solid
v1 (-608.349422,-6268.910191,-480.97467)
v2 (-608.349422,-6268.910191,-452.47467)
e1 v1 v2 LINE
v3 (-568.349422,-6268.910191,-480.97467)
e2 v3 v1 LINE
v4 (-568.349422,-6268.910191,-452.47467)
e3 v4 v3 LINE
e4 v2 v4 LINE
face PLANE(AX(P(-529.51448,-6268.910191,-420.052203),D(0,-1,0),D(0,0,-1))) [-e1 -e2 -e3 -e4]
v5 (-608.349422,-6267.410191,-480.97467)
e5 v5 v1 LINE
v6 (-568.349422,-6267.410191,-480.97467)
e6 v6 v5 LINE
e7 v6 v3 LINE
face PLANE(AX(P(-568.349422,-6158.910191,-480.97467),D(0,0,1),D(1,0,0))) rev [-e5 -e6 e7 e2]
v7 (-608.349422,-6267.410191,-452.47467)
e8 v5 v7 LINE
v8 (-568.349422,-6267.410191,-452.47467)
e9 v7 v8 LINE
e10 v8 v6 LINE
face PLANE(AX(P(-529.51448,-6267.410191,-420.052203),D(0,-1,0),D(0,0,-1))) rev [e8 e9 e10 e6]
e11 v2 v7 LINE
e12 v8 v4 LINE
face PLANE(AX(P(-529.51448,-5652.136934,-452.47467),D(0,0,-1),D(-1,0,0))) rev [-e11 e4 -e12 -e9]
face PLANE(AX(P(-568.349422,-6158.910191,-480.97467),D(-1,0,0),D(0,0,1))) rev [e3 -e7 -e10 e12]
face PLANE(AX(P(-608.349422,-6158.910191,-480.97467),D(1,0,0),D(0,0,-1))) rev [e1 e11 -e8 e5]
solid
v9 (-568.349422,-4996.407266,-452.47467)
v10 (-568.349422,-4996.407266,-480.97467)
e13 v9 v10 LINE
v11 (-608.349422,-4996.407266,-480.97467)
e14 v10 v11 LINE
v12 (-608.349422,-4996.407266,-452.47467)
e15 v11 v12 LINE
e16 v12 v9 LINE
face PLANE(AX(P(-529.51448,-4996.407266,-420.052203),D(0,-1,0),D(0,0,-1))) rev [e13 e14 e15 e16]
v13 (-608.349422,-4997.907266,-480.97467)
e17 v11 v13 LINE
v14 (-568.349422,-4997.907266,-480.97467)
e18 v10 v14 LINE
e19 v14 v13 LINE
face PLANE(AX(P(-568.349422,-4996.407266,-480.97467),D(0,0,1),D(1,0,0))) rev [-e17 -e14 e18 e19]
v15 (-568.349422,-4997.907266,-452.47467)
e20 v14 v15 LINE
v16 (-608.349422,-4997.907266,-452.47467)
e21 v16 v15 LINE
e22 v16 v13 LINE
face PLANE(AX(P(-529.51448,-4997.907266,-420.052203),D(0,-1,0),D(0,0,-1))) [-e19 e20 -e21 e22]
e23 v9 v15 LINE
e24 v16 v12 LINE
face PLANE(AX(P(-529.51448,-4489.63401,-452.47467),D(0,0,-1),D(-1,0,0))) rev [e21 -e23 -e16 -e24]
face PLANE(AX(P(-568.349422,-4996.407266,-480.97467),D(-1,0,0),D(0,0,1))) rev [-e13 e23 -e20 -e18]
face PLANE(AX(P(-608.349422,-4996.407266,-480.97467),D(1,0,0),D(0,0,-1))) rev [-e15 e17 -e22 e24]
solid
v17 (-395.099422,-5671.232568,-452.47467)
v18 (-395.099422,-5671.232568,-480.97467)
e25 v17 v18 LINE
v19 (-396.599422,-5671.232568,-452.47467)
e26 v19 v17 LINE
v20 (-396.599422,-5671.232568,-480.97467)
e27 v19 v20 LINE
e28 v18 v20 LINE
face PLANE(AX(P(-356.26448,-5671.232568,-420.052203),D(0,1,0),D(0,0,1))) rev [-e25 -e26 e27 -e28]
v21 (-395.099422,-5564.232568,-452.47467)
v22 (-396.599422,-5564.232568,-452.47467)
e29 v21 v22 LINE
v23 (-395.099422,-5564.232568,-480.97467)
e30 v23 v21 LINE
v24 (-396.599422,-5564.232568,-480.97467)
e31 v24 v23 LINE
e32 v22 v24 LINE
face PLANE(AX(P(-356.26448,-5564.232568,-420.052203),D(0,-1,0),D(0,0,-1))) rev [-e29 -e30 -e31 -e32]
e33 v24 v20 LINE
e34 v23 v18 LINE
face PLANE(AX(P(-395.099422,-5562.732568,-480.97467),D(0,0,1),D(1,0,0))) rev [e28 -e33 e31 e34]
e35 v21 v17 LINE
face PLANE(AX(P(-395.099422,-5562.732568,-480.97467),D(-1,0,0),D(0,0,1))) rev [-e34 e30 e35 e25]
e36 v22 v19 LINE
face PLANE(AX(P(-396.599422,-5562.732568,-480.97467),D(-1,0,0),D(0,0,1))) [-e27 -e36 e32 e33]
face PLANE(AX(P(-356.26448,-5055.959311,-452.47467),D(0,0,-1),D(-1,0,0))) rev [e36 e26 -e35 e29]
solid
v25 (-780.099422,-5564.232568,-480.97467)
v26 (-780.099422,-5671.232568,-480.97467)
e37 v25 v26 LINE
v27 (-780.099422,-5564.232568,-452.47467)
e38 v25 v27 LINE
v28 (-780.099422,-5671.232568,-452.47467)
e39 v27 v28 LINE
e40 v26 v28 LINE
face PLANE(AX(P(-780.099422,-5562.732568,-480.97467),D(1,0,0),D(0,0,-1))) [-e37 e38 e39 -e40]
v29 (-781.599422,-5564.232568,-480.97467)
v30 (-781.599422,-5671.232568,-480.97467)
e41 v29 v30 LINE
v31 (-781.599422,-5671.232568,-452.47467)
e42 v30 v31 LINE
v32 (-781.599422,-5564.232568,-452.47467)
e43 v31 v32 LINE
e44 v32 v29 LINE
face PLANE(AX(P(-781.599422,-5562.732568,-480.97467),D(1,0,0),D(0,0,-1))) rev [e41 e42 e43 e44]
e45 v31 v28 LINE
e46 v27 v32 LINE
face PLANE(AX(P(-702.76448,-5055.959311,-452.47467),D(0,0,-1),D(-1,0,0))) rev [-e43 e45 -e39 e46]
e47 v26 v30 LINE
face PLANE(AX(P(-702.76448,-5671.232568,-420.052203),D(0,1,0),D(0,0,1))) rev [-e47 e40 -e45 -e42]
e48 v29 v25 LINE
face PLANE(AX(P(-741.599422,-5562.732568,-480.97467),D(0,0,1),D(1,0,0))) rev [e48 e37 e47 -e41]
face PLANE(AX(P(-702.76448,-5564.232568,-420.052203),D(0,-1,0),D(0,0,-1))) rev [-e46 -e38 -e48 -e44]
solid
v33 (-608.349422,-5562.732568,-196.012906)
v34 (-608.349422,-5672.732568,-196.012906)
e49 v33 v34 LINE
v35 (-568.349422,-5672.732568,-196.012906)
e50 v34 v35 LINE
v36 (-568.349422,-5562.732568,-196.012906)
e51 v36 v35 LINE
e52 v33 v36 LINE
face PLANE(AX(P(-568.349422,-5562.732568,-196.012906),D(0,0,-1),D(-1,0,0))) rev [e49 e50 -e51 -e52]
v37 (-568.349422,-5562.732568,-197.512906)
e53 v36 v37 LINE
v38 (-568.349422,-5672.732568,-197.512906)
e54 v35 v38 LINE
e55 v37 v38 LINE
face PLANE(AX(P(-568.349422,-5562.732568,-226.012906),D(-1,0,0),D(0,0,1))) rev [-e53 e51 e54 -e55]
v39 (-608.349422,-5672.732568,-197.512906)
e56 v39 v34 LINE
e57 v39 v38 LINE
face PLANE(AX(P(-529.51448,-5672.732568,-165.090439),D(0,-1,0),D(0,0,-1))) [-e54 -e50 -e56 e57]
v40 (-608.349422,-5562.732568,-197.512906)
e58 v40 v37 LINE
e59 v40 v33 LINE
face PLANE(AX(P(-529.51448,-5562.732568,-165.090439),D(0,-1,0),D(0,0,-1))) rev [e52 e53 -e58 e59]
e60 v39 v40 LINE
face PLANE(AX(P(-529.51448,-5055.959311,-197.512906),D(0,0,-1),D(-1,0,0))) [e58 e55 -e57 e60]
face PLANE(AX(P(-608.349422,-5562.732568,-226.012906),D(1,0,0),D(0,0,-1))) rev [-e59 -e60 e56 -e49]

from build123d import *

# Parameters (mm, degrees)
SKETCH1_W            = 400
SKETCH1_H            = 300
BOSS_EXTRUDE1_DEPTH  = 1100
SHELL1_T             = -15
SPLIT2_START         = -6167.732568069
SPLIT2_OUTLINE_W     = 15
SPLIT2_OUTLINE_H     = 285
SPLIT2_DEPTH         = 1100
SPLIT2_2_OUTLINE_W   = 385
SPLIT2_2_OUTLINE_H   = 285
SPLIT2_2_DEPTH       = 15
SPLIT2_START_2       = -5082.732568069
SPLIT2_3_OUTLINE_W   = 385
SPLIT2_3_OUTLINE_H   = 285
SPLIT2_3_DEPTH       = 15
SPLIT2_START_3       = -6152.732568069
SPLIT2_4_OUTLINE_W   = 15
SPLIT2_4_OUTLINE_H   = 285
SPLIT2_4_DEPTH       = 1070
SPLIT2_5_OUTLINE_W   = 400
SPLIT2_5_OUTLINE_H   = 285
SPLIT2_5_DEPTH       = 15
SPLIT2_6_OUTLINE_W   = 400
SPLIT2_6_OUTLINE_H   = 285
SPLIT2_6_DEPTH       = 15
SCALE1_START         = -6275.660190895
SCALE1_OUTLINE_W     = 400
SCALE1_OUTLINE_H     = 285
SCALE1_OUTLINE_W_2   = 40
SCALE1_OUTLINE_H_2   = 28.5
SCALE1_OUTLINE_W_3   = 1.5
SCALE1_OUTLINE_H_3   = 15
SCALE1_OUTLINE_H_4   = 1.5
SCALE1_DEPTH         = 1286.002924444
SCALE1_START_2       = -6267.410190895
SCALE1_2_OUTLINE_W   = 1.5
SCALE1_2_OUTLINE_H   = 28.5
SCALE1_2_OUTLINE_W_2 = 40
SCALE1_2_OUTLINE_H_2 = 1.5
SCALE1_2_DEPTH       = 594.677622826
SCALE1_START_3       = -5562.732568069
SCALE1_3_OUTLINE_W   = 1.5
SCALE1_3_OUTLINE_H   = 28.5
SCALE1_3_OUTLINE_W_2 = 40
SCALE1_3_OUTLINE_H_2 = 1.5
SCALE1_3_DEPTH       = 564.825301618
SCALE1_4_OUTLINE_W   = 1.5
SCALE1_4_OUTLINE_H   = 28.5
SCALE1_4_OUTLINE_W_2 = 40
SCALE1_4_DEPTH       = 6.75
SCALE1_START_4       = -4996.407266451
SCALE1_5_OUTLINE_W   = 1.5
SCALE1_5_OUTLINE_H   = 28.5
SCALE1_5_OUTLINE_W_2 = 40
SCALE1_5_DEPTH       = 6.75
SCALE1_START_5       = -6268.910190895
SCALE1_6_OUTLINE_W   = 1.5
SCALE1_6_OUTLINE_H   = 28.5
SCALE1_6_DEPTH       = 597.677622826
SCALE1_START_6       = -5564.232568069
SCALE1_7_OUTLINE_W   = 1.5
SCALE1_7_OUTLINE_H   = 28.5
SCALE1_7_DEPTH       = 567.825301618


# Read off the part's stored shape, not the designer's step: Split2, Scale1
with BuildPart() as part:
    # Sketch1 → Boss-Extrude1 (new body)
    with BuildSketch(Plane(origin=(0, -6167.732568069, 0), x_dir=(1, 0, 0), z_dir=(0, 1, 0))):
        with Locations((-588.349422114, 459.224669701)):
            Rectangle(SKETCH1_W, SKETCH1_H)
    extrude(amount=BOSS_EXTRUDE1_DEPTH)

    # Shell1
    shell1_openings = [part.faces().sort_by_distance(p)[0] for p in [
        (-588.349422114, -5617.732568069, -609.224669701),
    ]]
    offset(amount=SHELL1_T, openings=shell1_openings, kind=Kind.INTERSECTION)


with BuildPart() as body_2:
    # Split1: the piece on the far side of the plane
    add(part.part)
    split(bisect_by=Plane(origin=(0, 0, -324.224669701), x_dir=(-1, 0, 0), z_dir=(0, 0, -1)), keep=Keep.BOTTOM)


with BuildPart() as part_1:
    add(part.part)

    # Split1
    split(bisect_by=Plane(origin=(0, 0, -324.224669701), x_dir=(-1, 0, 0), z_dir=(0, 0, -1)), keep=Keep.TOP)

    # Split2 outline → Split2 (cut)
    with BuildSketch(Plane(origin=(0, 0, 0), x_dir=(1, 0, 0), z_dir=(0, 1, 0)).offset(SPLIT2_START)):
        with Locations((-395.849422114, 466.724669701)):
            Rectangle(SPLIT2_OUTLINE_W, SPLIT2_OUTLINE_H)
    extrude(amount=SPLIT2_DEPTH, mode=Mode.SUBTRACT)

    # Split2 2 outline → Split2 2 (cut)
    with BuildSketch(Plane(origin=(0, 0, 0), x_dir=(1, 0, 0), z_dir=(0, 1, 0)).offset(SPLIT2_START)):
        with Locations((-595.849422114, 466.724669701)):
            Rectangle(SPLIT2_2_OUTLINE_W, SPLIT2_2_OUTLINE_H)
    extrude(amount=SPLIT2_2_DEPTH, mode=Mode.SUBTRACT)

    # Split2 3 outline → Split2 3 (cut)
    with BuildSketch(Plane(origin=(0, 0, 0), x_dir=(1, 0, 0), z_dir=(0, 1, 0)).offset(SPLIT2_START_2)):
        with Locations((-595.849422114, 466.724669701)):
            Rectangle(SPLIT2_3_OUTLINE_W, SPLIT2_3_OUTLINE_H)
    extrude(amount=SPLIT2_3_DEPTH, mode=Mode.SUBTRACT)


with BuildPart() as body_3:
    # Split2 4 outline → Split2 4 (new body)
    with BuildSketch(Plane(origin=(0, 0, 0), x_dir=(1, 0, 0), z_dir=(0, 1, 0)).offset(SPLIT2_START_3)):
        with Locations((-395.849422114, 466.724669701)):
            Rectangle(SPLIT2_4_OUTLINE_W, SPLIT2_4_OUTLINE_H)
    extrude(amount=SPLIT2_4_DEPTH)


with BuildPart() as body_4:
    # Split2 5 outline → Split2 5 (new body)
    with BuildSketch(Plane(origin=(0, 0, 0), x_dir=(1, 0, 0), z_dir=(0, 1, 0)).offset(SPLIT2_START)):
        with Locations((-588.349422114, 466.724669701)):
            Rectangle(SPLIT2_5_OUTLINE_W, SPLIT2_5_OUTLINE_H)
    extrude(amount=SPLIT2_5_DEPTH)


with BuildPart() as body_5:
    # Split2 6 outline → Split2 6 (new body)
    with BuildSketch(Plane(origin=(0, 0, 0), x_dir=(1, 0, 0), z_dir=(0, 1, 0)).offset(SPLIT2_START_2)):
        with Locations((-588.349422114, 466.724669701)):
            Rectangle(SPLIT2_6_OUTLINE_W, SPLIT2_6_OUTLINE_H)
    extrude(amount=SPLIT2_6_DEPTH)


with BuildPart() as body_2_1:
    # Body-Move/Copy1: moved
    add(body_2.part.moved(Location((0, 0, 119.961763837))))


with BuildPart() as body_5_1:
    # Body-Move/Copy2: moved
    add(body_5.part.moved(Location((0, 78.075301619, 0))))


with BuildPart() as body_4_1:
    # Body-Move/Copy3: moved
    add(body_4.part.moved(Location((0, -107.927622826, 0))))


with BuildPart() as scale1_tool:
    # Scale1 outline → Scale1 (new body)
    # profile 1 of 2: a face of its own
    with BuildSketch(Plane(origin=(0, 0, 0), x_dir=(1, 0, 0), z_dir=(0, 1, 0)).offset(SCALE1_START)):
        with Locations((-588.349422114, 466.724669701)):
            Rectangle(SCALE1_OUTLINE_W, SCALE1_OUTLINE_H)
        with Locations((-588.349422114, 466.724669701)):
            Rectangle(SCALE1_OUTLINE_W_2, SCALE1_OUTLINE_H_2, mode=Mode.SUBTRACT)
        with Locations((-780.849422114, 466.724669701)):
            Rectangle(SCALE1_OUTLINE_W_3, SCALE1_OUTLINE_H_2, mode=Mode.SUBTRACT)
        with Locations((-395.849422114, 466.724669701)):
            Rectangle(SCALE1_OUTLINE_W_3, SCALE1_OUTLINE_H_2, mode=Mode.SUBTRACT)
    # profile 2 of 2: a face of its own
    with BuildSketch(Plane(origin=(0, 0, 0), x_dir=(1, 0, 0), z_dir=(0, 1, 0)).offset(SCALE1_START)):
        with Locations((-588.349422114, 196.762905865)):
            Rectangle(SCALE1_OUTLINE_W, SCALE1_OUTLINE_H_3)
        with Locations((-588.349422114, 196.762905865)):
            Rectangle(SCALE1_OUTLINE_W_2, SCALE1_OUTLINE_H_4, mode=Mode.SUBTRACT)
    extrude(amount=SCALE1_DEPTH)


with BuildPart() as part_2:
    add(part_1.part)

    # Scale1: cut by scale1_tool
    add(scale1_tool.part, mode=Mode.SUBTRACT)


with BuildPart() as body_2_2:
    add(body_2_1.part)

    # Scale1: cut by scale1_tool
    add(scale1_tool.part, mode=Mode.SUBTRACT)


with BuildPart() as body_3_1:
    add(body_3.part)

    # Scale1: cut by scale1_tool
    add(scale1_tool.part, mode=Mode.SUBTRACT)


with BuildPart() as body_4_2:
    add(body_4_1.part)

    # Scale1: cut by scale1_tool
    add(scale1_tool.part, mode=Mode.SUBTRACT)


with BuildPart() as body_5_2:
    add(body_5_1.part)

    # Scale1: cut by scale1_tool
    add(scale1_tool.part, mode=Mode.SUBTRACT)


with BuildPart() as scale1_2_tool:
    # Scale1 2 outline → Scale1 2 (new body)
    with BuildSketch(Plane(origin=(0, 0, 0), x_dir=(1, 0, 0), z_dir=(0, 1, 0)).offset(SCALE1_START_2)):
        with Locations((-780.849422114, 466.724669701)):
            Rectangle(SCALE1_2_OUTLINE_W, SCALE1_2_OUTLINE_H)
        with Locations((-395.849422114, 466.724669701)):
            Rectangle(SCALE1_2_OUTLINE_W, SCALE1_2_OUTLINE_H)
        with Locations((-588.349422114, 466.724669701)):
            Rectangle(SCALE1_2_OUTLINE_W_2, SCALE1_2_OUTLINE_H)
        with Locations((-588.349422114, 196.762905865)):
            Rectangle(SCALE1_2_OUTLINE_W_2, SCALE1_2_OUTLINE_H_2)
    extrude(amount=SCALE1_2_DEPTH)


with BuildPart() as part_3:
    add(part_2.part)

    # Scale1 2: cut by scale1_2_tool
    add(scale1_2_tool.part, mode=Mode.SUBTRACT)


with BuildPart() as body_2_3:
    add(body_2_2.part)

    # Scale1 2: cut by scale1_2_tool
    add(scale1_2_tool.part, mode=Mode.SUBTRACT)


with BuildPart() as body_3_2:
    add(body_3_1.part)

    # Scale1 2: cut by scale1_2_tool
    add(scale1_2_tool.part, mode=Mode.SUBTRACT)


with BuildPart() as body_4_3:
    add(body_4_2.part)

    # Scale1 2: cut by scale1_2_tool
    add(scale1_2_tool.part, mode=Mode.SUBTRACT)

    # Scale1 4 outline → Scale1 4 (cut)
    with BuildSketch(Plane(origin=(0, 0, 0), x_dir=(1, 0, 0), z_dir=(0, 1, 0)).offset(SCALE1_START)):
        with Locations((-780.849422114, 466.724669701)):
            Rectangle(SCALE1_4_OUTLINE_W, SCALE1_4_OUTLINE_H)
        with Locations((-395.849422114, 466.724669701)):
            Rectangle(SCALE1_4_OUTLINE_W, SCALE1_4_OUTLINE_H)
        with Locations((-588.349422114, 466.724669701)):
            Rectangle(SCALE1_4_OUTLINE_W_2, SCALE1_4_OUTLINE_H)
    extrude(amount=SCALE1_4_DEPTH, mode=Mode.SUBTRACT)


with BuildPart() as scale1_3_tool:
    # Scale1 3 outline → Scale1 3 (new body)
    with BuildSketch(Plane(origin=(0, 0, 0), x_dir=(1, 0, 0), z_dir=(0, 1, 0)).offset(SCALE1_START_3)):
        with Locations((-780.849422114, 466.724669701)):
            Rectangle(SCALE1_3_OUTLINE_W, SCALE1_3_OUTLINE_H)
        with Locations((-395.849422114, 466.724669701)):
            Rectangle(SCALE1_3_OUTLINE_W, SCALE1_3_OUTLINE_H)
        with Locations((-588.349422114, 466.724669701)):
            Rectangle(SCALE1_3_OUTLINE_W_2, SCALE1_3_OUTLINE_H)
        with Locations((-588.349422114, 196.762905865)):
            Rectangle(SCALE1_3_OUTLINE_W_2, SCALE1_3_OUTLINE_H_2)
    extrude(amount=SCALE1_3_DEPTH)


with BuildPart() as part_4:
    add(part_3.part)

    # Scale1 3: cut by scale1_3_tool
    add(scale1_3_tool.part, mode=Mode.SUBTRACT)


with BuildPart() as body_2_4:
    add(body_2_3.part)

    # Scale1 3: cut by scale1_3_tool
    add(scale1_3_tool.part, mode=Mode.SUBTRACT)


with BuildPart() as body_3_3:
    add(body_3_2.part)

    # Scale1 3: cut by scale1_3_tool
    add(scale1_3_tool.part, mode=Mode.SUBTRACT)


with BuildPart() as body_5_3:
    add(body_5_2.part)

    # Scale1 3: cut by scale1_3_tool
    add(scale1_3_tool.part, mode=Mode.SUBTRACT)

    # Scale1 5 outline → Scale1 5 (cut)
    with BuildSketch(Plane(origin=(0, 0, 0), x_dir=(1, 0, 0), z_dir=(0, 1, 0)).offset(SCALE1_START_4)):
        with Locations((-780.849422114, 466.724669701)):
            Rectangle(SCALE1_5_OUTLINE_W, SCALE1_5_OUTLINE_H)
        with Locations((-395.849422114, 466.724669701)):
            Rectangle(SCALE1_5_OUTLINE_W, SCALE1_5_OUTLINE_H)
        with Locations((-588.349422114, 466.724669701)):
            Rectangle(SCALE1_5_OUTLINE_W_2, SCALE1_5_OUTLINE_H)
    extrude(amount=SCALE1_5_DEPTH, mode=Mode.SUBTRACT)


with BuildPart() as scale1_6_tool:
    # Scale1 6 outline → Scale1 6 (new body)
    with BuildSketch(Plane(origin=(0, 0, 0), x_dir=(1, 0, 0), z_dir=(0, 1, 0)).offset(SCALE1_START_5)):
        with Locations((-780.849422114, 466.724669701)):
            Rectangle(SCALE1_6_OUTLINE_W, SCALE1_6_OUTLINE_H)
        with Locations((-395.849422114, 466.724669701)):
            Rectangle(SCALE1_6_OUTLINE_W, SCALE1_6_OUTLINE_H)
    extrude(amount=SCALE1_6_DEPTH)


with BuildPart() as part_5:
    add(part_4.part)

    # Scale1 6: cut by scale1_6_tool
    add(scale1_6_tool.part, mode=Mode.SUBTRACT)


with BuildPart() as body_3_4:
    add(body_3_3.part)

    # Scale1 6: cut by scale1_6_tool
    add(scale1_6_tool.part, mode=Mode.SUBTRACT)


with BuildPart() as body_4_4:
    add(body_4_3.part)

    # Scale1 6: cut by scale1_6_tool
    add(scale1_6_tool.part, mode=Mode.SUBTRACT)


with BuildPart() as scale1_7_tool:
    # Scale1 7 outline → Scale1 7 (new body)
    with BuildSketch(Plane(origin=(0, 0, 0), x_dir=(1, 0, 0), z_dir=(0, 1, 0)).offset(SCALE1_START_6)):
        with Locations((-780.849422114, 466.724669701)):
            Rectangle(SCALE1_7_OUTLINE_W, SCALE1_7_OUTLINE_H)
        with Locations((-395.849422114, 466.724669701)):
            Rectangle(SCALE1_7_OUTLINE_W, SCALE1_7_OUTLINE_H)
    extrude(amount=SCALE1_7_DEPTH)


with BuildPart() as part_6:
    add(part_5.part)

    # Scale1 7: cut by scale1_7_tool
    add(scale1_7_tool.part, mode=Mode.SUBTRACT)


with BuildPart() as body_3_5:
    add(body_3_4.part)

    # Scale1 7: cut by scale1_7_tool
    add(scale1_7_tool.part, mode=Mode.SUBTRACT)


with BuildPart() as body_5_4:
    add(body_5_3.part)

    # Scale1 7: cut by scale1_7_tool
    add(scale1_7_tool.part, mode=Mode.SUBTRACT)


solid = Compound([body_2_4.part, body_4_4.part, part_6.part, body_3_5.part, body_5_4.part])
